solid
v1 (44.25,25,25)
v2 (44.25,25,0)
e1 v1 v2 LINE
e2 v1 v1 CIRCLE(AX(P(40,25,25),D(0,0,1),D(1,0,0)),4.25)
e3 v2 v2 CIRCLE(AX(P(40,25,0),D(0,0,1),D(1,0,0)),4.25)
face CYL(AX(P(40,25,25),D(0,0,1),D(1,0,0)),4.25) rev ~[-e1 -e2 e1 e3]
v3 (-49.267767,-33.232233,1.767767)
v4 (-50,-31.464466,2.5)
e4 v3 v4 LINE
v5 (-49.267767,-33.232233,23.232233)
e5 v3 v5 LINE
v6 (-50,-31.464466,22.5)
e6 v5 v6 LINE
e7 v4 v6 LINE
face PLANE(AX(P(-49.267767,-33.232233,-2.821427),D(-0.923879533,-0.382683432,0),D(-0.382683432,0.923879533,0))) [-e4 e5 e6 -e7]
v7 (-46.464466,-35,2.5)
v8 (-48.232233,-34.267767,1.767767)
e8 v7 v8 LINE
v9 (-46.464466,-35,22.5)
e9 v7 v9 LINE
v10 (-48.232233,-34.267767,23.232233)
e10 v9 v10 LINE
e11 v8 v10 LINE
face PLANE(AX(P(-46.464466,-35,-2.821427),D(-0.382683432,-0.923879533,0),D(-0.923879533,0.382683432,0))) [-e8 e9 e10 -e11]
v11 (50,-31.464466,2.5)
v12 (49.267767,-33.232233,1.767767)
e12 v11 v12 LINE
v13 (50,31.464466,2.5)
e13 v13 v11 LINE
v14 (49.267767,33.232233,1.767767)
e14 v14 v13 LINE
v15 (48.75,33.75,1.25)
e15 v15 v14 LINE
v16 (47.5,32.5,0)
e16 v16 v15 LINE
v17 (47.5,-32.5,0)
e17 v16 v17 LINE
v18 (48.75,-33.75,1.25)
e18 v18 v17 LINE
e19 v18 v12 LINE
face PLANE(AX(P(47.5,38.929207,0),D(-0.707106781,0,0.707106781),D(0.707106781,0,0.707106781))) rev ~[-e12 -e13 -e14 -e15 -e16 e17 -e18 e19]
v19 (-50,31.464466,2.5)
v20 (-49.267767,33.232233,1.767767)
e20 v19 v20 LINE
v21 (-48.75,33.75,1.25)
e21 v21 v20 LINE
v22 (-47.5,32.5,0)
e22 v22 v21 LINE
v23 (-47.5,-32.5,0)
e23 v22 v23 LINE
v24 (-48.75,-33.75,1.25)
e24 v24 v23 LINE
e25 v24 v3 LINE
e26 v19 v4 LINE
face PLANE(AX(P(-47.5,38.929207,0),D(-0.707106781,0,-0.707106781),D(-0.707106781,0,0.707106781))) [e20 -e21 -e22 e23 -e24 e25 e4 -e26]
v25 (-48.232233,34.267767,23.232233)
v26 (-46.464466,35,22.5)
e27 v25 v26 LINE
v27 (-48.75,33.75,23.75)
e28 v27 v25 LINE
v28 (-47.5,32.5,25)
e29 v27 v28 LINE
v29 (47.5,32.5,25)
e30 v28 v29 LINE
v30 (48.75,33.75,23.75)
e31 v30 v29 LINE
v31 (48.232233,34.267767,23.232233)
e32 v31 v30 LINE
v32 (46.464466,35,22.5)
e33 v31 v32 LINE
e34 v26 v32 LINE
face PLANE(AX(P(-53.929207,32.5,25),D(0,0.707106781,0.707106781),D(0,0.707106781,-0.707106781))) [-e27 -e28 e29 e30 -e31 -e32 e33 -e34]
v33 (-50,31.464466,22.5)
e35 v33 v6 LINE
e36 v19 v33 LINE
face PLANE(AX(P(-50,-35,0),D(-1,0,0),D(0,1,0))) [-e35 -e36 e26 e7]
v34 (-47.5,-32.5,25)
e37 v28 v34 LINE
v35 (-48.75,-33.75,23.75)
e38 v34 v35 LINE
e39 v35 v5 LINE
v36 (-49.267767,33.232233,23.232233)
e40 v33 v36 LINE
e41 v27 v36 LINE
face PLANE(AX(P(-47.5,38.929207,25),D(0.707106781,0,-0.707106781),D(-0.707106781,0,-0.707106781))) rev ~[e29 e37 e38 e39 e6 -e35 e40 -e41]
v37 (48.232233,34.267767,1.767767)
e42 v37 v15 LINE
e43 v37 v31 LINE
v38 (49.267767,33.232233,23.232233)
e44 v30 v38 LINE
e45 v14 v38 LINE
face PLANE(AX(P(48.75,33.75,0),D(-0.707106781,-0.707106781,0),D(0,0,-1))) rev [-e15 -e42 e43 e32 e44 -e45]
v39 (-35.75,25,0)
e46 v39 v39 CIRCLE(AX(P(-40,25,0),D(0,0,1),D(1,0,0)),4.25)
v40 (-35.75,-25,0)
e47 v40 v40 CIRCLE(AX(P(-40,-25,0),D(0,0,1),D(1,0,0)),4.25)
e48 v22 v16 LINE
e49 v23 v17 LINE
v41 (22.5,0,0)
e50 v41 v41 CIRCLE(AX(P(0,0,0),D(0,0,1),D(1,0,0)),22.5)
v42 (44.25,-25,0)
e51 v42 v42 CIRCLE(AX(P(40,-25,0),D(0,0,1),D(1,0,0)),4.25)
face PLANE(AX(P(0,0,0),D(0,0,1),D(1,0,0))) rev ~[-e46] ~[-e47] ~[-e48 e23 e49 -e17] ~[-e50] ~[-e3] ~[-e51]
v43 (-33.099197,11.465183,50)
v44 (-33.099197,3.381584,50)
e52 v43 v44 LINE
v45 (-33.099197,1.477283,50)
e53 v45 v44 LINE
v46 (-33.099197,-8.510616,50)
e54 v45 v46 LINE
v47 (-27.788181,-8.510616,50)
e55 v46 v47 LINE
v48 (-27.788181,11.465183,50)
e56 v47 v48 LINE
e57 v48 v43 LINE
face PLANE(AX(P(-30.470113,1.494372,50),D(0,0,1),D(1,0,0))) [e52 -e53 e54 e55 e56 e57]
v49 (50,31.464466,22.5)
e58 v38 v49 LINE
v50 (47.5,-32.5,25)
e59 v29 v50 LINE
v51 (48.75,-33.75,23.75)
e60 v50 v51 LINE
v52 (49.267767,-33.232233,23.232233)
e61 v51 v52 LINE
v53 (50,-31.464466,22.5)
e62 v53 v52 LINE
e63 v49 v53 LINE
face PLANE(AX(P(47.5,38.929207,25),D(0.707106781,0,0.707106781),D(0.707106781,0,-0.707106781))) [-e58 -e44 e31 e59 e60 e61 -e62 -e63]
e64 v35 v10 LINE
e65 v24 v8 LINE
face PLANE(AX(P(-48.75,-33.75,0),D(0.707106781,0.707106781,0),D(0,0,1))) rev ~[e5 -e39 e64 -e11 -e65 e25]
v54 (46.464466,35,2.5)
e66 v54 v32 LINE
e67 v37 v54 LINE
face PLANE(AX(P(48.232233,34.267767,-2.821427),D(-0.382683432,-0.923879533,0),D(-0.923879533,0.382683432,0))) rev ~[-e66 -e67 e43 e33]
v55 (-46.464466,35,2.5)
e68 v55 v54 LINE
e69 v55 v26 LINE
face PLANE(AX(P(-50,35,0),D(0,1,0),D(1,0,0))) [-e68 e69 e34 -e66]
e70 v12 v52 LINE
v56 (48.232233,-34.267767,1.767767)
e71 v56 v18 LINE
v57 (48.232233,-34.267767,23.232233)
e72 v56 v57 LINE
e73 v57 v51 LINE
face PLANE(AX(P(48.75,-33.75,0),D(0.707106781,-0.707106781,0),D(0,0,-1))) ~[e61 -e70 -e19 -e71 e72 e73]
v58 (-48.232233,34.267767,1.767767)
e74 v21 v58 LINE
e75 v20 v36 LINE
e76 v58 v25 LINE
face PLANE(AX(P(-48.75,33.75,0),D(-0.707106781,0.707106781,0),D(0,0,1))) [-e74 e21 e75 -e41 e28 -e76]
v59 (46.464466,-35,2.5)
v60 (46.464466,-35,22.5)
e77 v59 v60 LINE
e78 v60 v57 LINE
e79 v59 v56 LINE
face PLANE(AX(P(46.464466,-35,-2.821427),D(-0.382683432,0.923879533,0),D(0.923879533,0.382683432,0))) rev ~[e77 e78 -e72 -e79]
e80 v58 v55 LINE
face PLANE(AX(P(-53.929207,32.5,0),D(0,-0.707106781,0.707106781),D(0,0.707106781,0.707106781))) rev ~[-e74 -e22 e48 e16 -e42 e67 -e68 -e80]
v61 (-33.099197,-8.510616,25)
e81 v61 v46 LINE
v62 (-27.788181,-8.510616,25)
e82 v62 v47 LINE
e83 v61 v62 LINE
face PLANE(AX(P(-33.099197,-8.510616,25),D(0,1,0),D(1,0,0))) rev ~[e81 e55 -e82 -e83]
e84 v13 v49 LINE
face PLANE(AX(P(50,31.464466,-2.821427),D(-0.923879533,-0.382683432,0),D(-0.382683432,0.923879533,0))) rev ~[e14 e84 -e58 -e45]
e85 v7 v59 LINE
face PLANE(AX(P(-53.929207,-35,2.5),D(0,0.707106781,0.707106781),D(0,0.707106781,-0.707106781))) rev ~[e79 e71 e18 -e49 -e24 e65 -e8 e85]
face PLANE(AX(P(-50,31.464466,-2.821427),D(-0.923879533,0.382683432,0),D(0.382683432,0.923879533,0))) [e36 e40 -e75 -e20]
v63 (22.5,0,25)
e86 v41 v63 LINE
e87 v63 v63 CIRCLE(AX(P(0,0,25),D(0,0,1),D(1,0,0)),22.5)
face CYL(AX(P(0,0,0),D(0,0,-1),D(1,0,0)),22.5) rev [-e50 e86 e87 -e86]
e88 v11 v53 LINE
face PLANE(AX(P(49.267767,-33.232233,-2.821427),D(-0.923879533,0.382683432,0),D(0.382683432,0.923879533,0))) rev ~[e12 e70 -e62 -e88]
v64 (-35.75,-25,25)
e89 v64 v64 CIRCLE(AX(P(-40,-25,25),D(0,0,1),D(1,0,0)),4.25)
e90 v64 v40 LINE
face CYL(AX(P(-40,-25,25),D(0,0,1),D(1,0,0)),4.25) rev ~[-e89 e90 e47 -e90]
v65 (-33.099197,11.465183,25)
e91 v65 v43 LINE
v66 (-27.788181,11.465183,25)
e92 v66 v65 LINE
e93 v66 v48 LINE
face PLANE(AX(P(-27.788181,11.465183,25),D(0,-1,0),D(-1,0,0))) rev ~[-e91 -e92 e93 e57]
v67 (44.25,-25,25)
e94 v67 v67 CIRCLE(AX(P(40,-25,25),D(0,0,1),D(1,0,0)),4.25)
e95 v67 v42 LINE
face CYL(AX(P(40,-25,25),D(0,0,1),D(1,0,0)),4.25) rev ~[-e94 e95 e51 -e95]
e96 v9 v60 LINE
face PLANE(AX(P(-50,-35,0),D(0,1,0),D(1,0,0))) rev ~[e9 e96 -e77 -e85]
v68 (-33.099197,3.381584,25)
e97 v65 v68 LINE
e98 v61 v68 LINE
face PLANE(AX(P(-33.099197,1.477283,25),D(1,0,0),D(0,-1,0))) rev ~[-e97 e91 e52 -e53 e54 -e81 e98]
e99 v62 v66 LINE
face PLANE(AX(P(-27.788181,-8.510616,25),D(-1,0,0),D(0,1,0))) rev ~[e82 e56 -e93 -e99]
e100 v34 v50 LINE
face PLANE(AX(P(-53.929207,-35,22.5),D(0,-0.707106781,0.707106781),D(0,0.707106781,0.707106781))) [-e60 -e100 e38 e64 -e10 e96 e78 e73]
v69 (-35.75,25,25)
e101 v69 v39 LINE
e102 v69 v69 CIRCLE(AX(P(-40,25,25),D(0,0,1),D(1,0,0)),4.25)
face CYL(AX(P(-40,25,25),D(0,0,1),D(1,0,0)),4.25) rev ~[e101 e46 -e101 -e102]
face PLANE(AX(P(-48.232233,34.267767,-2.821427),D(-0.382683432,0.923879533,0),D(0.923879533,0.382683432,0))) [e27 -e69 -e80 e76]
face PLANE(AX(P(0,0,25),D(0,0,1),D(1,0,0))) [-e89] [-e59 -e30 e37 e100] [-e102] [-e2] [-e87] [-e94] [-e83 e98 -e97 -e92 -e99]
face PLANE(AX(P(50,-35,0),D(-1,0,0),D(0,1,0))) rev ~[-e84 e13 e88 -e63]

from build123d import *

# Parameters (mm, degrees)
F0_W        = 100
F0_H        = 70
F0_R        = 22.5
F1_DEPTH    = 25
F2_R        = 4.25
F3_DEPTH    = 25.001
F4_SIZE     = 2.5
F5_T1_DEPTH = 77.8584149398
F5_T3_DEPTH = 30.6428543011
F5_T5_DEPTH = 107.8584149398
F6_W        = 0.4621222615
F6_H        = 1.904300414
F7_DEPTH    = 25


# Not quite as in the source:
# - a fillet or chamfer that OpenCascade refuses, or shapes differently, is made with other operations: its cross-section is extruded or revolved along the edge and cut away or added


with BuildPart() as f1:
    # F0 (on Top) → F1 (new body)
    with BuildSketch(Plane.XY):
        Rectangle(F0_W, F0_H)
        Circle(F0_R, mode=Mode.SUBTRACT)
    extrude(amount=F1_DEPTH)

    # F2 (on face) → F3 (cut, through all)
    with BuildSketch(Plane.XY.offset(25)):
        with Locations((-40, 25)):
            Circle(F2_R)
        with Locations((-40, -25)):
            Circle(F2_R)
        with Locations((40, -25)):
            Circle(F2_R)
        with Locations((40, 25)):
            Circle(F2_R)
    extrude(amount=-F3_DEPTH, mode=Mode.SUBTRACT)

    # F4
    f4_edges = [f1.edges().sort_by_distance(p)[0] for p in [
        (50, 35, 12.5),
        (50, -35, 12.5),
        (-50, -35, 12.5),
        (-50, 35, 12.5),
    ]]
    chamfer(f4_edges, length=F4_SIZE)

    # F5: chamfer of 2.5 on 16 edges, made by hand

    # F5_s2 → F5_t1 (cut)
    with BuildSketch(Plane.XZ.offset(-38.9292074699)):
        Polygon((47.5, 25), (50, 22.5), (50, 25), align=None)
        Polygon((47.5, 0), (50, 2.5), (50, 0), align=None)
        Polygon((-47.5, 0), (-50, 2.5), (-50, 0), align=None)
        Polygon((-47.5, 25), (-50, 22.5), (-50, 25), align=None)
    extrude(amount=F5_T1_DEPTH, mode=Mode.SUBTRACT)

    # F5_s4 → F5_t3 (cut)
    with BuildSketch(Plane.XY.offset(-2.8214271505)):
        Polygon((49.267766953, -33.232233047), (50, -31.4644660941), (50, -32.5), align=None)
        Polygon((50, 31.4644660941), (49.267766953, 33.232233047), (50, 32.5), align=None)
        Polygon((-46.4644660941, -35), (-48.232233047, -34.267766953), (-47.5, -35), align=None)
        Polygon((46.4644660941, -35), (48.232233047, -34.267766953), (47.5, -35), align=None)
        Polygon((-50, 31.4644660941), (-49.267766953, 33.232233047), (-50, 32.5), align=None)
        Polygon((-49.267766953, -33.232233047), (-50, -31.4644660941), (-50, -32.5), align=None)
        Polygon((48.232233047, 34.267766953), (46.4644660941, 35), (47.5, 35), align=None)
        Polygon((-48.232233047, 34.267766953), (-46.4644660941, 35), (-47.5, 35), align=None)
    extrude(amount=F5_T3_DEPTH, mode=Mode.SUBTRACT)

    # F5_s6 → F5_t5 (cut)
    with BuildSketch(Plane.YZ.offset(-53.9292074699)):
        Polygon((-35, 2.5), (-32.5, 0), (-35, 0), align=None)
        Polygon((-35, 22.5), (-32.5, 25), (-35, 25), align=None)
        Polygon((32.5, 0), (35, 2.5), (35, 0), align=None)
        Polygon((32.5, 25), (35, 22.5), (35, 25), align=None)
    extrude(amount=F5_T5_DEPTH, mode=Mode.SUBTRACT)

    # F6 (on face) → F7 (join)
    with BuildSketch(Plane.XY.offset(25)):
        Polygon((-33.0991968513, 1.4772834256), (-33.0991968513, -8.5106156766), (-27.7881808579, -8.5106156766), (-27.7881808579, 11.4651825279), (-33.0991968513, 11.4651825279), (-33.0991968513, 3.3815838397), (-32.6370745897, 3.3815838397), (-32.6370745897, 1.4772834256), align=None)
        with Locations((-32.8681357205, 2.4294336326)):
            Rectangle(F6_W, F6_H)
    extrude(amount=F7_DEPTH)


solid = f1.part
